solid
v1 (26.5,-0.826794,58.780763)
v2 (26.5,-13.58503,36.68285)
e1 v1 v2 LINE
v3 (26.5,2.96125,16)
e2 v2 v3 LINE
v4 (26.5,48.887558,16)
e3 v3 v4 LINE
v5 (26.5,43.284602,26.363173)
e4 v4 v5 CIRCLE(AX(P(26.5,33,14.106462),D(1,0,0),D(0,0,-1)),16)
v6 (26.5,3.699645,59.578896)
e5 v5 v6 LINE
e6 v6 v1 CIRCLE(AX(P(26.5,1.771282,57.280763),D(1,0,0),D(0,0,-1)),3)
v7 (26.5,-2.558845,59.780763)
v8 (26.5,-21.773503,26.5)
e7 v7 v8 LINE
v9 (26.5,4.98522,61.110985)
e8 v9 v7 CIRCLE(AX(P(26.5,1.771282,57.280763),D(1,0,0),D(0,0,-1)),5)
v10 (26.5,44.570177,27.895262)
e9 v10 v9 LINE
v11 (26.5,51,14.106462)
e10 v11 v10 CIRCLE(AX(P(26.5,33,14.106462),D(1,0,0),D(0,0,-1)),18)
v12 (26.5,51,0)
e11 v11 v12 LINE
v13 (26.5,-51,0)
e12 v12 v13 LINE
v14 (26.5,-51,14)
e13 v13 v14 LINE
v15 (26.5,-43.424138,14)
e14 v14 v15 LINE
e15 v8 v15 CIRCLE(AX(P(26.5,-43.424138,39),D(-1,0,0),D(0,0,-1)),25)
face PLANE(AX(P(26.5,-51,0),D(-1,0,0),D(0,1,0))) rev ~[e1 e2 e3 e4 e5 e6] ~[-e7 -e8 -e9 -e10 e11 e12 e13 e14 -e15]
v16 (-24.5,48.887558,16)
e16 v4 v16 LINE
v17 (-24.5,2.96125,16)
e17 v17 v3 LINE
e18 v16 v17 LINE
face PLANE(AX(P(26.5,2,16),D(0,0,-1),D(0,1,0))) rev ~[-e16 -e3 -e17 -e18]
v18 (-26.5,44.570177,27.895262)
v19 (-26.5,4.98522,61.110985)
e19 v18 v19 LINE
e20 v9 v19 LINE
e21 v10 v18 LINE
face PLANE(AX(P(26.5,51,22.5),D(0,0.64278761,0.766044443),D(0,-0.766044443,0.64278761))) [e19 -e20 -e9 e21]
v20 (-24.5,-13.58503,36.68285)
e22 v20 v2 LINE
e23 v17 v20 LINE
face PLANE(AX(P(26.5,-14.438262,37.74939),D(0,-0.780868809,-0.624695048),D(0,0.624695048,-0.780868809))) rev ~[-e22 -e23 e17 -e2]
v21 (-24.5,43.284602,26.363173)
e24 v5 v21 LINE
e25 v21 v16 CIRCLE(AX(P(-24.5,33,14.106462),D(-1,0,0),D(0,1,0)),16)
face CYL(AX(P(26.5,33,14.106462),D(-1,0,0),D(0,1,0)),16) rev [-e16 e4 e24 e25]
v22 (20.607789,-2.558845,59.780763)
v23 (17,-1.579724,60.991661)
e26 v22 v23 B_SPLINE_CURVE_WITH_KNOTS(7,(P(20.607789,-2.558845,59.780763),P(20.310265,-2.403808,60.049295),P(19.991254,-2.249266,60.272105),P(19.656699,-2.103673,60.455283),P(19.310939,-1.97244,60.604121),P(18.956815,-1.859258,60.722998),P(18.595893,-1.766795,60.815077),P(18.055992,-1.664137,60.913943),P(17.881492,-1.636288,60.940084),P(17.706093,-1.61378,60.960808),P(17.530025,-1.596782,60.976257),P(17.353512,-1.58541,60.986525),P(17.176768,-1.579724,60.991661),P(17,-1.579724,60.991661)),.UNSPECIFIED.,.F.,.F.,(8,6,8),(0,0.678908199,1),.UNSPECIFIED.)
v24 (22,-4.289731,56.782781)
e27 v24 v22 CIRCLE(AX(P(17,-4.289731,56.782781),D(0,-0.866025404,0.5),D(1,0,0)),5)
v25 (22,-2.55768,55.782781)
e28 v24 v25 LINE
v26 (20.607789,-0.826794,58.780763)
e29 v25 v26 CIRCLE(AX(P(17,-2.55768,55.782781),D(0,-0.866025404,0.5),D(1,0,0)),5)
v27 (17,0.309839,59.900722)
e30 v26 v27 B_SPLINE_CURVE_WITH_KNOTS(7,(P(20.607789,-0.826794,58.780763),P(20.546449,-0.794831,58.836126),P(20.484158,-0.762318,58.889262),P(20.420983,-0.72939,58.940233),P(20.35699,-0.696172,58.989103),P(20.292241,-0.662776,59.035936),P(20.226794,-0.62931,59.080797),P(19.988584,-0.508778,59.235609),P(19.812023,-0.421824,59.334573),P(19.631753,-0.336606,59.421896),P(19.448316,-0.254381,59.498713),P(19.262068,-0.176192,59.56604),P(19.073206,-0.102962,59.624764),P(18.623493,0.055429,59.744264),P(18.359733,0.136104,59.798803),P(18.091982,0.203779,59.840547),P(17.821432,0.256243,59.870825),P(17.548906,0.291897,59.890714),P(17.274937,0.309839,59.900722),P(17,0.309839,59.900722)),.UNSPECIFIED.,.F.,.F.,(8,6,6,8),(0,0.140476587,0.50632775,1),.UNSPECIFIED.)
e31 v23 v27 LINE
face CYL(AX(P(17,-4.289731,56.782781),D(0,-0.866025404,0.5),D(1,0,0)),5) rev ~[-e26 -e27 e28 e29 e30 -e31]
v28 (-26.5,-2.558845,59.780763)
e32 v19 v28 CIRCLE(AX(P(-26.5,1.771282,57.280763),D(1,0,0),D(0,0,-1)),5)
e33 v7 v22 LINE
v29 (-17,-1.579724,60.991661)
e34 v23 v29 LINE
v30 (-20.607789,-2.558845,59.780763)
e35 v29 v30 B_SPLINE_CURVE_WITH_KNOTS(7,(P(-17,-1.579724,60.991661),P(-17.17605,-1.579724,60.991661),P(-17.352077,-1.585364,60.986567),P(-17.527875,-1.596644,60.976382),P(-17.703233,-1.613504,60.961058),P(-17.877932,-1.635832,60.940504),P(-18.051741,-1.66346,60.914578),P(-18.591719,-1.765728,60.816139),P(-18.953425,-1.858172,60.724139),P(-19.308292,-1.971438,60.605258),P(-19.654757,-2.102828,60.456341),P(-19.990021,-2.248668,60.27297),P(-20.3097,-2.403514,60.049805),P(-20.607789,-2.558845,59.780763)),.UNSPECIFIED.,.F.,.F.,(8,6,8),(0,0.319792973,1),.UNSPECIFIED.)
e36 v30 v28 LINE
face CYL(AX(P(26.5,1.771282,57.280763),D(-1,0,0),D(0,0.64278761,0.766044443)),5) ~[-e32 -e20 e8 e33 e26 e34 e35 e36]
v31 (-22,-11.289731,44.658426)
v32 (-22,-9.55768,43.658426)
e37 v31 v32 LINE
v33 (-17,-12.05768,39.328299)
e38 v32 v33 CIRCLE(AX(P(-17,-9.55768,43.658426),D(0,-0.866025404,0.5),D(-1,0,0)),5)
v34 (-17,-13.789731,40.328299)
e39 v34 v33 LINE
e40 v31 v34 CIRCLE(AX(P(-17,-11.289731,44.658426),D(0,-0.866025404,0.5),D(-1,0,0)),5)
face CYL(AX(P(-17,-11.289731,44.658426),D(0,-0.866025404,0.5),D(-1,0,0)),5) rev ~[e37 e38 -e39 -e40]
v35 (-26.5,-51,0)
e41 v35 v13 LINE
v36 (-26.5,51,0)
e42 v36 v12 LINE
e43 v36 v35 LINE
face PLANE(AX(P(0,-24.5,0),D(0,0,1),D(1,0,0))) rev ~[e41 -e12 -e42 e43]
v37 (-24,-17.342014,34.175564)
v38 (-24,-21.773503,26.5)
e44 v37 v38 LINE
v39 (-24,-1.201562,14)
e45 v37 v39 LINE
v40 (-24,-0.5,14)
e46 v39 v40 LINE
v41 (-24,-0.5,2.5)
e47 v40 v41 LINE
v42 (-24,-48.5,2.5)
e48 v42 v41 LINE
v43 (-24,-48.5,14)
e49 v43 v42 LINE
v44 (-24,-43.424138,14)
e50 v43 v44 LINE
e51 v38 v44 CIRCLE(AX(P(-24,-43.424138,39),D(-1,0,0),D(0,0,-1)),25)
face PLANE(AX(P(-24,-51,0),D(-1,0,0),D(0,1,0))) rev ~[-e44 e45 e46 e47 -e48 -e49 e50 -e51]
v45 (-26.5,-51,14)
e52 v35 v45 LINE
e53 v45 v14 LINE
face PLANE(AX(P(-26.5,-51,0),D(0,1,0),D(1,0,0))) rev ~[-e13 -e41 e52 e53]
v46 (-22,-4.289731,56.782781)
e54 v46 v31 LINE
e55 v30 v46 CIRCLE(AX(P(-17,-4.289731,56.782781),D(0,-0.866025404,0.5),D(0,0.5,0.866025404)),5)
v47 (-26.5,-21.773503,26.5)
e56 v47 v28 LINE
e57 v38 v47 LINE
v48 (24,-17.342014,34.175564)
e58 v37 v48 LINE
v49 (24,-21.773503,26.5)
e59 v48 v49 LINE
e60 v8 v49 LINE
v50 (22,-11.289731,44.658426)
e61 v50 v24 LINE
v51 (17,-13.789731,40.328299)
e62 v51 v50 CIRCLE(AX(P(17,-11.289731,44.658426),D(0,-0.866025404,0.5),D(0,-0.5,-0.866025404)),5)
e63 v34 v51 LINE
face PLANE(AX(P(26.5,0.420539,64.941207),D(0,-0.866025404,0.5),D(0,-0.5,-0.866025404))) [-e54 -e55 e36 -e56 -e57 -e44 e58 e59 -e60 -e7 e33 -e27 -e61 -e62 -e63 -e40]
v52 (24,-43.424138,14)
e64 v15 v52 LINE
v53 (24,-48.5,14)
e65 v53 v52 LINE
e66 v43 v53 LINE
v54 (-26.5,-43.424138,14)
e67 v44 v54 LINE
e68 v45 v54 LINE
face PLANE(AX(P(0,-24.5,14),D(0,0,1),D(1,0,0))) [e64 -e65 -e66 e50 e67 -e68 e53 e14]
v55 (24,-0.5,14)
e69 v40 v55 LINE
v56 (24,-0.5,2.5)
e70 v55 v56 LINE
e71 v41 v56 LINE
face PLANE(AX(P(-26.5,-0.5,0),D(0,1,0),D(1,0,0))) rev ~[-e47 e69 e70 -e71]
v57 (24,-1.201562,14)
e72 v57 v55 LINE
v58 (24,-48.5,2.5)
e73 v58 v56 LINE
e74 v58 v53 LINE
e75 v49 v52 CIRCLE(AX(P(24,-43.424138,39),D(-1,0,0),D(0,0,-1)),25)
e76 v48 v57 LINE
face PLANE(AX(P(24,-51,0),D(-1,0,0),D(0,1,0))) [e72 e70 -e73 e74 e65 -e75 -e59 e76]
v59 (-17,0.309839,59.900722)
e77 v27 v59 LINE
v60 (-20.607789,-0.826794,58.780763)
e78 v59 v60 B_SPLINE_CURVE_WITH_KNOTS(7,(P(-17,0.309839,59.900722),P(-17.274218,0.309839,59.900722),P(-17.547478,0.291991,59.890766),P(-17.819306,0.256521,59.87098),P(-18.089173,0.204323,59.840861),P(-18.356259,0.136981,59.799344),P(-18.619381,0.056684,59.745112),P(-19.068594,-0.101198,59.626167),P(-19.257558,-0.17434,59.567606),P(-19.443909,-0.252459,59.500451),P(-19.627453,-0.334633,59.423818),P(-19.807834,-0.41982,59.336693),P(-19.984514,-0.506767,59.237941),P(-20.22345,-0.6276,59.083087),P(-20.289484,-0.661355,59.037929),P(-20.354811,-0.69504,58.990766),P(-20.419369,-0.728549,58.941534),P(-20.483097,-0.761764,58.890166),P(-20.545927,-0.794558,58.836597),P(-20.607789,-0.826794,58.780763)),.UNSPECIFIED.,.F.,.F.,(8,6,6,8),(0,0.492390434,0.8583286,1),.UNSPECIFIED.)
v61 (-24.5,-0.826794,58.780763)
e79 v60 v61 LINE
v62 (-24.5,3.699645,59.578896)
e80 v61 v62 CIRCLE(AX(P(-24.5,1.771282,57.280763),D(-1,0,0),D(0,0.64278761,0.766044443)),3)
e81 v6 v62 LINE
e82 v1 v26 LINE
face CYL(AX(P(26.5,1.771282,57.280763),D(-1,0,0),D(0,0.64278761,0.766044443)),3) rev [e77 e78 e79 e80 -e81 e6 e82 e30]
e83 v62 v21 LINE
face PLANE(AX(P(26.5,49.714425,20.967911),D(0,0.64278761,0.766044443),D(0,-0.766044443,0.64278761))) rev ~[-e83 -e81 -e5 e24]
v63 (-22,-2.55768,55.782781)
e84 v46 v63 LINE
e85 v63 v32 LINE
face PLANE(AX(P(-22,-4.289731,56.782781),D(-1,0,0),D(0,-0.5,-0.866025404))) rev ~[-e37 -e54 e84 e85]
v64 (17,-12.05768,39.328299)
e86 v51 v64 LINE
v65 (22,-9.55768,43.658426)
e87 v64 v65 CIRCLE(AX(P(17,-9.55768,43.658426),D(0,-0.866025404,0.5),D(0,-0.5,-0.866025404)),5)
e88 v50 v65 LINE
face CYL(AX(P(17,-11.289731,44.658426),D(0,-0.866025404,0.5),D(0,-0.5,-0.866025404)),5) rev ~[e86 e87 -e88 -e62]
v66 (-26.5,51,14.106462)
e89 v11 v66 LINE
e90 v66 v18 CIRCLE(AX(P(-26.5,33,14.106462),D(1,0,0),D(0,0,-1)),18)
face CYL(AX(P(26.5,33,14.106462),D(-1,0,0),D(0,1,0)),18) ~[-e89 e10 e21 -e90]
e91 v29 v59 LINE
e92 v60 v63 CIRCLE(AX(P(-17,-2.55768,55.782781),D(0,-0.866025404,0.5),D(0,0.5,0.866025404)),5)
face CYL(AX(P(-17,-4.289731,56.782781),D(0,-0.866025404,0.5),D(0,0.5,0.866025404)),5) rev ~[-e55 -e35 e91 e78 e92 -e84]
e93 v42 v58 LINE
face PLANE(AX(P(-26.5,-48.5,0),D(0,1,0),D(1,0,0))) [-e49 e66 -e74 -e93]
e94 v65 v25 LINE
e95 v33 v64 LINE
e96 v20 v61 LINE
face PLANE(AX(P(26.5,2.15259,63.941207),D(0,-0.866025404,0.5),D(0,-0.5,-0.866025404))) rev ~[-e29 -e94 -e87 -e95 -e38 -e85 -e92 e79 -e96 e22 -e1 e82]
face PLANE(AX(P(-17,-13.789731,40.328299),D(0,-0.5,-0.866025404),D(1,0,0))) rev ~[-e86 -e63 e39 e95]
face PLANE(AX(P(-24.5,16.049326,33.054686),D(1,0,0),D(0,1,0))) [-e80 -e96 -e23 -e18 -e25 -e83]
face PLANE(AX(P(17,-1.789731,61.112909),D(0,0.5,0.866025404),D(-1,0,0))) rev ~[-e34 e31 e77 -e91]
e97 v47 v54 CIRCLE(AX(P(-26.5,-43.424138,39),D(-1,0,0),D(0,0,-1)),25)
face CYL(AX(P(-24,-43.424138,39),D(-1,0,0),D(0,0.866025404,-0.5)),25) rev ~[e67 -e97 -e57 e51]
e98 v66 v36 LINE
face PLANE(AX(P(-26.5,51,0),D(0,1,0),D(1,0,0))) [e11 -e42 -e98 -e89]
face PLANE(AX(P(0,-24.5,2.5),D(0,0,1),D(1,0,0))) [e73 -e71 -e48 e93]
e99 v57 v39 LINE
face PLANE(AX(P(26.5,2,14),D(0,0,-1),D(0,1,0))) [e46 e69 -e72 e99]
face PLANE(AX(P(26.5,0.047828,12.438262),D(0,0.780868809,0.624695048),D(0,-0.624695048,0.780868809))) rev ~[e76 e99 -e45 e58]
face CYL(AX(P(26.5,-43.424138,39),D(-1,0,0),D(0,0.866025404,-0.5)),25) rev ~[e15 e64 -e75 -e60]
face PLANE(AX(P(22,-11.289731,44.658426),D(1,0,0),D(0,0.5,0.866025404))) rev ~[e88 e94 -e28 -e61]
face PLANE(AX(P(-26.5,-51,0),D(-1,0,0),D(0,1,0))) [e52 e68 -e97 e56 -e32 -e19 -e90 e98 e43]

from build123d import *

# Parameters (mm, degrees)
F0_W      = 53
F0_H      = 53
F1_DEPTH  = 14
F0_H_2    = 49
F2_DEPTH  = 14
F3_T      = -2.5
F5_DEPTH  = 53
F6_DEPTH  = 53
F7_T      = -2.5
F9_R      = 18
F10_R     = 5
F11_T     = -2
F12_DEPTH = 7.2
F14_R     = 25


with BuildPart() as f1:
    # F0 (on Top) → F1 (new body)
    with BuildSketch(Plane.XY):
        with Locations((0, -24.5)):
            Rectangle(F0_W, F0_H)
    extrude(amount=F1_DEPTH)

    # F3
    f3_openings = [f1.faces().sort_by_distance(p)[0] for p in [
        (0, -24.5, 14),
    ]]
    offset(amount=F3_T, openings=f3_openings)


with BuildPart() as f2:
    # F0 (on Top) → F2 (new body)
    with BuildSketch(Plane.XY):
        with Locations((0, 26.5)):
            Rectangle(F0_W, F0_H_2)
    extrude(amount=F2_DEPTH)


with BuildPart() as f5:
    # F4 (on face) → F5 (new body, through all)
    with BuildSketch(Plane.YZ.offset(26.5)):
        Polygon((-16, 36.5), (2, 14), (51, 14), (51, 22.5), (0.4205387023, 64.94120732), align=None)
    extrude(amount=-F5_DEPTH)

    # F9
    f9_edges = [f5.edges().sort_by_distance(p)[0] for p in [
        (0, 51, 22.5),
    ]]
    fillet(f9_edges, radius=F9_R)

    # F10
    f10_edges = [f5.edges().sort_by_distance(p)[0] for p in [
        (0, 0.420539, 64.941207),
    ]]
    fillet(f10_edges, radius=F10_R)

    # F11
    f11_openings = [f5.faces().sort_by_distance(p)[0] for p in [
        (26.5, 14.357834, 32.967777),
    ]]
    offset(amount=F11_T, openings=f11_openings)

    # F8 (on face) → F12 (cut)
    with BuildSketch(Plane(origin=(0, -27.8049636191, 16.0532032303), x_dir=(1, 0, 0), z_dir=(0, -0.8660254038, 0.5))):
        with BuildLine():
            Line((17, 52.0304659404), (-17, 52.0304659404))
            ThreePointArc((-17, 52.0304659404), (-20.5355339059, 50.5659998464), (-22, 47.0304659404))
            Line((-22, 47.0304659404), (-22, 33.0304659404))
            ThreePointArc((-22, 33.0304659404), (-20.5355339059, 29.4949320345), (-17, 28.0304659404))
            Line((-17, 28.0304659404), (17, 28.0304659404))
            ThreePointArc((17, 28.0304659404), (20.5355339059, 29.4949320345), (22, 33.0304659404))
            Line((22, 33.0304659404), (22, 47.0304659404))
            ThreePointArc((22, 47.0304659404), (20.5355339059, 50.5659998464), (17, 52.0304659404))
        make_face()
    extrude(amount=-F12_DEPTH, mode=Mode.SUBTRACT)


with BuildPart() as f6:
    # F4 (on face) → F6 (new body, through all)
    with BuildSketch(Plane.YZ.offset(26.5)):
        Polygon((-16, 14), (2, 14), (-16, 36.5), align=None)
        Polygon((-16, 36.5), (-28.9903810568, 14), (-16, 14), align=None)
    extrude(amount=-F6_DEPTH)

    # F7
    f7_openings = [f6.faces().sort_by_distance(p)[0] for p in [
        (0, -22.495191, 25.25),
        (0, -13.495191, 14),
    ]]
    offset(amount=F7_T, openings=f7_openings)

    # F13: union F5, F2, F1
    add(f5.part)
    add(f2.part)
    add(f1.part)

    # F14
    f14_edges = [f6.edges().sort_by_distance(p)[0] for p in [
        (25.25, -28.990381, 14),
        (-25.25, -28.990381, 14),
    ]]
    fillet(f14_edges, radius=F14_R)


solid = f6.part
